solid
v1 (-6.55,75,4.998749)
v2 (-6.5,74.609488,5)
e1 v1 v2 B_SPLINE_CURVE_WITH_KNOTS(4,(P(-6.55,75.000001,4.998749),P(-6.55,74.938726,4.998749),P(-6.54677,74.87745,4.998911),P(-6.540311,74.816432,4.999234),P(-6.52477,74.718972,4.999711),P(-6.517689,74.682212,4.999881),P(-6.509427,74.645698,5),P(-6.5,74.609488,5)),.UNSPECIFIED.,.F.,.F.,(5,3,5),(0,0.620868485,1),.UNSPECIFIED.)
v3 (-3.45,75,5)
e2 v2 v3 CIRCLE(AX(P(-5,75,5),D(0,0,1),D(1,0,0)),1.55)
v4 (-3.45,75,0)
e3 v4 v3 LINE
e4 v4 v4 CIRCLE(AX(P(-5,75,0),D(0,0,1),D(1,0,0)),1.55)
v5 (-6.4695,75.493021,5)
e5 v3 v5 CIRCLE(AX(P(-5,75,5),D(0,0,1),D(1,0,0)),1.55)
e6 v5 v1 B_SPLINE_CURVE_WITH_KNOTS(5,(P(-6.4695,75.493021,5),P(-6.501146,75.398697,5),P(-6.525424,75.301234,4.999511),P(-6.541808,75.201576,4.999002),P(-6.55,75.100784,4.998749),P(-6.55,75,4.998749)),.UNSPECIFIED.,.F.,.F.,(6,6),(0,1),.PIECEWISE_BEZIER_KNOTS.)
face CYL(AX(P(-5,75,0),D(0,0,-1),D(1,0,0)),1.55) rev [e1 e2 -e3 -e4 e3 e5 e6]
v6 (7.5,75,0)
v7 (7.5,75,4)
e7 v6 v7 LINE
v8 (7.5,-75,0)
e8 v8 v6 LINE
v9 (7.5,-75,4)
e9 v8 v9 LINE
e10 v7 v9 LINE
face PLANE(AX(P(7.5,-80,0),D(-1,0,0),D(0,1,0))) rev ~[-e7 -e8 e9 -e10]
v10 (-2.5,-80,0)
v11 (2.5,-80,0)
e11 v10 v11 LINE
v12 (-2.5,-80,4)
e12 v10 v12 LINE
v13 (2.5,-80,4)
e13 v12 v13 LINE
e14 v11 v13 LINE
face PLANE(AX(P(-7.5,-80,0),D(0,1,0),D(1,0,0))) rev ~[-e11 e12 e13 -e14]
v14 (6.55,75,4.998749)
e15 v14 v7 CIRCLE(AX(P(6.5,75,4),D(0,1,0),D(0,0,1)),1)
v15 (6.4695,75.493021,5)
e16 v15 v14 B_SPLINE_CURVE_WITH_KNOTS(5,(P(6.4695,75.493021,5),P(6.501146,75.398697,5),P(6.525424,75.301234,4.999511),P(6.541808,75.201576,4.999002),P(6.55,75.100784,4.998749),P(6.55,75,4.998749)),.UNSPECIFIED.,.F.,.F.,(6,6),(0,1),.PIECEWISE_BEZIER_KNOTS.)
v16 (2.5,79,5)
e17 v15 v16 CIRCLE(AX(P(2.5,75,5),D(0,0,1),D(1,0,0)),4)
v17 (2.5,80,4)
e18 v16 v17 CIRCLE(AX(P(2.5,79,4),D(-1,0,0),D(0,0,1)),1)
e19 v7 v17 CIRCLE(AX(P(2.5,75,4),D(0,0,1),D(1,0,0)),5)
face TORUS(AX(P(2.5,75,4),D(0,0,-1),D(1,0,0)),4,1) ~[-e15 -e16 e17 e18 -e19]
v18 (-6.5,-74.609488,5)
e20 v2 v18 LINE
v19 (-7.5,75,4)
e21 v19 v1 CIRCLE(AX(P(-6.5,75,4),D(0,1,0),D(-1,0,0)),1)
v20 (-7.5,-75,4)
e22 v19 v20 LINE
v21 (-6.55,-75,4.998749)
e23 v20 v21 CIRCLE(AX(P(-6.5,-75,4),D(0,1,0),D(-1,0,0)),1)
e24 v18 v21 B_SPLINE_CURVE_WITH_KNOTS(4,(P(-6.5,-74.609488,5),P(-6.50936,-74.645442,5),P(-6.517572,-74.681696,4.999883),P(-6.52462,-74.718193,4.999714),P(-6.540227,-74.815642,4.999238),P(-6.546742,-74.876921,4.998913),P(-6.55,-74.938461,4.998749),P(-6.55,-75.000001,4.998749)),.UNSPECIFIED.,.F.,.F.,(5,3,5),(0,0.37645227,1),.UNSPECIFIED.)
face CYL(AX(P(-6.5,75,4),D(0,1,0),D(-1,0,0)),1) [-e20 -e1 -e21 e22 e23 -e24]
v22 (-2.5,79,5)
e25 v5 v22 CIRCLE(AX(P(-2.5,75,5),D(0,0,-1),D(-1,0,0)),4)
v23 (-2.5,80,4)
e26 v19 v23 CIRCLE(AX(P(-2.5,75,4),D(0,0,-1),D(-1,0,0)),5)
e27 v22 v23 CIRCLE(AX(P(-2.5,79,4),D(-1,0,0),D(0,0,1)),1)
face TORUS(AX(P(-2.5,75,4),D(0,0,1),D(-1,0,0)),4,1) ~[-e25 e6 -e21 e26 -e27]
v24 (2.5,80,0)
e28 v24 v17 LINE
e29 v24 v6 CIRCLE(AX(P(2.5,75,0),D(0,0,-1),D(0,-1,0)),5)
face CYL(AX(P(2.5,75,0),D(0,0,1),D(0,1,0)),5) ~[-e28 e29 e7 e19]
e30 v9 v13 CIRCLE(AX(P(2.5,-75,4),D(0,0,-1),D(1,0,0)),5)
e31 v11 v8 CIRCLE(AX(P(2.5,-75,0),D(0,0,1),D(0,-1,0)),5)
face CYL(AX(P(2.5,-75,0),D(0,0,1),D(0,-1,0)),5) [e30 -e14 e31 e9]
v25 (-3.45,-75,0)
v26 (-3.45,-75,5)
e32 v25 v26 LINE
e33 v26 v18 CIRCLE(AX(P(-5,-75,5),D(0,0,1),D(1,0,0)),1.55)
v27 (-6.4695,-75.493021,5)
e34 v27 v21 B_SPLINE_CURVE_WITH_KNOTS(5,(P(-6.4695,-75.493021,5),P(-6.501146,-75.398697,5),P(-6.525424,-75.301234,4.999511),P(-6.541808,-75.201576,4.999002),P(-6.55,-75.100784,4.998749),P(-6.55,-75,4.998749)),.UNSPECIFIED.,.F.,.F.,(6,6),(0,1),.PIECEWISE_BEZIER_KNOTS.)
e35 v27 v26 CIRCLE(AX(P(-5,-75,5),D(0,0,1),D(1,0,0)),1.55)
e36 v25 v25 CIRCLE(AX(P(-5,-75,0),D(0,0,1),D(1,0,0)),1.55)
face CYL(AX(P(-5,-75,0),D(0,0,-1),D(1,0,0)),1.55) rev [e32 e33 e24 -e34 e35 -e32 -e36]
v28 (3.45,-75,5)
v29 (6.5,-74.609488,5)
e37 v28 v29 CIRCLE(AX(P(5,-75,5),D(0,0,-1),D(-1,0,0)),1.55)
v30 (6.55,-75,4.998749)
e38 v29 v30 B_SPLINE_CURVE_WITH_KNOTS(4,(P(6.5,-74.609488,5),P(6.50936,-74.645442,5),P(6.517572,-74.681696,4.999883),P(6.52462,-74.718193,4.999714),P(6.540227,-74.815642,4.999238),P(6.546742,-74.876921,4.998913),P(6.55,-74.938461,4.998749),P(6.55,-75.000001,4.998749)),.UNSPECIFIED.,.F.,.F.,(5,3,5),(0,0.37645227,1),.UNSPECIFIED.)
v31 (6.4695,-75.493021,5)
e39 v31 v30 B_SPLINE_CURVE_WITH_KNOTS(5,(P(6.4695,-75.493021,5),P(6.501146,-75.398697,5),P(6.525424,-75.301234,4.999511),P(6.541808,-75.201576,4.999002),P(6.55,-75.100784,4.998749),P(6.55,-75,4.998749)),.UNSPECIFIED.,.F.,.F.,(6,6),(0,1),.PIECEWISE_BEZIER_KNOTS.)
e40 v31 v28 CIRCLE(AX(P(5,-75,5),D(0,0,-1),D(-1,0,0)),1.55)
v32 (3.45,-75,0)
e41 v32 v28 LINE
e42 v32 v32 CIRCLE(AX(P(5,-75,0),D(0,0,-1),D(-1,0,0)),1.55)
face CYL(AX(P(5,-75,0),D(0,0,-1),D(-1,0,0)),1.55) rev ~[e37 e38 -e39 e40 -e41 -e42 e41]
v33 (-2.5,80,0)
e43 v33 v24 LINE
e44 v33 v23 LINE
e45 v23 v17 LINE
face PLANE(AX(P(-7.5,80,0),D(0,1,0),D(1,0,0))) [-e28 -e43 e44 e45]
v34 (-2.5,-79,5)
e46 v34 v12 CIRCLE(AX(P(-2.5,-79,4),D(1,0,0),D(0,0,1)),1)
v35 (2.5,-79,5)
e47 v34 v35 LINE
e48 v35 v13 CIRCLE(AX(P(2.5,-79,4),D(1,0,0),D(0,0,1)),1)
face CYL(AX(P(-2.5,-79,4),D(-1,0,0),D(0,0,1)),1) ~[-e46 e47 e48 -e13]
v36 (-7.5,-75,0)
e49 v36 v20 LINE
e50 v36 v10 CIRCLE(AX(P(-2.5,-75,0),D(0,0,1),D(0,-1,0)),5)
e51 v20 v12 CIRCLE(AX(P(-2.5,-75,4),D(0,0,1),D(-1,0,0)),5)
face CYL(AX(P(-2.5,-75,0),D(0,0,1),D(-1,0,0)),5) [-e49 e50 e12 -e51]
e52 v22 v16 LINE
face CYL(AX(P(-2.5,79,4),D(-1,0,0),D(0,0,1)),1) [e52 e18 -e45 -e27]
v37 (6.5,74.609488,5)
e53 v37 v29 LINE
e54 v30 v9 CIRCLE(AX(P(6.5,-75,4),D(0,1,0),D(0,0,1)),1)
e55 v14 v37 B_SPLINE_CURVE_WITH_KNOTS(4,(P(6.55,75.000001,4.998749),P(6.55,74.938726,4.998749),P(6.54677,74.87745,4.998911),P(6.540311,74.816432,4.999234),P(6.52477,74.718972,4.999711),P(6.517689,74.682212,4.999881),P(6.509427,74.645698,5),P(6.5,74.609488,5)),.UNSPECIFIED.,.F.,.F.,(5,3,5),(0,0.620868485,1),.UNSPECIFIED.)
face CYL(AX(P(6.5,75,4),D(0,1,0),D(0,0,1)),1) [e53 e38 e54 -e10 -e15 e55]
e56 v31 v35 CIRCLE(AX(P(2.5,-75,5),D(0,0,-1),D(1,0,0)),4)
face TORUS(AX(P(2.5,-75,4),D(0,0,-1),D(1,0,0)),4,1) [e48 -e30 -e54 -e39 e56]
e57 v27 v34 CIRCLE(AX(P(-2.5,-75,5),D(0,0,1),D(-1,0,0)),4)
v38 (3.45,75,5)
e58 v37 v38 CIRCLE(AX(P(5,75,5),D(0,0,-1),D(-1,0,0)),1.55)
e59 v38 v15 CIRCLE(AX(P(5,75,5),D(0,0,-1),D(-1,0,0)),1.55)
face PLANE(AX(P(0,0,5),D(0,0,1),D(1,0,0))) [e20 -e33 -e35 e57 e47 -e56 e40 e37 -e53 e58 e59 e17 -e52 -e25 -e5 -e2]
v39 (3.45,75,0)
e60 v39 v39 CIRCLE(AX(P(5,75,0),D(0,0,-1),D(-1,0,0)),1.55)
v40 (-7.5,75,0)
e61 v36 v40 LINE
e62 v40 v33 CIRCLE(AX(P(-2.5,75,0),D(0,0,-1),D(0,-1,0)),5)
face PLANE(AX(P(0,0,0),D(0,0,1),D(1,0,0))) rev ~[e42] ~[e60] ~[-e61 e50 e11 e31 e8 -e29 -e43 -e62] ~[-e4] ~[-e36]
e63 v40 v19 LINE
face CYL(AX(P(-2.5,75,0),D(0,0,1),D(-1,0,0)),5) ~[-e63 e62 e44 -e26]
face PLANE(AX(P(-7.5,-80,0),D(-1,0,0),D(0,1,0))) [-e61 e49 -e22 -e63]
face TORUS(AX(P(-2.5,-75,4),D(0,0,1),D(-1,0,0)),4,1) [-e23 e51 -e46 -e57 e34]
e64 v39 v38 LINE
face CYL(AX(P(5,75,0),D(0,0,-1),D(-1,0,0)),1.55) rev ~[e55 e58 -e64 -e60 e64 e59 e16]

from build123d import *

# Parameters (mm, degrees)
F0_W         = 15
F0_H         = 160
F0_R         = 1.55
F1_DEPTH     = 5
F2_R         = 5
F3_T1_DEPTH  = 150
F3_T3_DEPTH  = 5
F3_T6_ANGLE  = 90
F3_T8_ANGLE  = 90
F3_T10_ANGLE = 90
F3_T12_ANGLE = 90


# Not quite as in the source:
# - a fillet or chamfer that OpenCascade refuses, or shapes differently, is made with other operations: its cross-section is extruded or revolved along the edge and cut away or added


with BuildPart() as f1:
    # F0 (on Top) → F1 (new body)
    with BuildSketch(Plane.XY):
        Rectangle(F0_W, F0_H)
        with Locations((-5, -75)):
            Circle(F0_R, mode=Mode.SUBTRACT)
        with BuildLine():
            ThreePointArc((6.55, -75), (5, -76.55), (3.45, -75))
            ThreePointArc((3.45, -75), (5, -73.45), (6.55, -75))
        make_face(mode=Mode.SUBTRACT)
        with Locations((-5, 75)):
            Circle(F0_R, mode=Mode.SUBTRACT)
        with BuildLine():
            ThreePointArc((6.55, 75), (5, 73.45), (3.45, 75))
            ThreePointArc((3.45, 75), (5, 76.55), (6.55, 75))
        make_face(mode=Mode.SUBTRACT)
    extrude(amount=F1_DEPTH)

    # F2
    f2_edges = [f1.edges().sort_by_distance(p)[0] for p in [
        (7.5, -80, 2.5),
        (-7.5, -80, 2.5),
        (7.5, 80, 2.5),
        (-7.5, 80, 2.5),
    ]]
    fillet(f2_edges, radius=F2_R)

    # F3: fillet of radius 1 on 8 edges, made by hand

    # F3_s2 → F3_t1 (cut)
    with BuildSketch(Plane.XZ.offset(-75)):
        with BuildLine():
            ThreePointArc((6.5, 5), (7.2071067812, 4.7071067812), (7.5, 4))
            Line((7.5, 4), (7.5, 5))
            Line((7.5, 5), (6.5, 5))
        make_face()
        with BuildLine():
            ThreePointArc((-7.5, 4), (-7.2071067812, 4.7071067812), (-6.5, 5))
            Line((-6.5, 5), (-7.5, 5))
            Line((-7.5, 5), (-7.5, 4))
        make_face()
    extrude(amount=F3_T1_DEPTH, mode=Mode.SUBTRACT)

    # F3_s4 → F3_t3 (cut)
    with BuildSketch(Plane.YZ.offset(-2.5)):
        with BuildLine():
            ThreePointArc((79, 5), (79.7071067812, 4.7071067812), (80, 4))
            Line((80, 4), (80, 5))
            Line((80, 5), (79, 5))
        make_face()
        with BuildLine():
            ThreePointArc((-79, 5), (-79.7071067812, 4.7071067812), (-80, 4))
            Line((-80, 4), (-80, 5))
            Line((-80, 5), (-79, 5))
        make_face()
    extrude(amount=F3_T3_DEPTH, mode=Mode.SUBTRACT)

    # F3_s5 → F3_t6 (revolve, cut)
    with BuildSketch(Plane.XZ.offset(-75)):
        with BuildLine():
            ThreePointArc((-7.5, 4), (-7.2071067812, 4.7071067812), (-6.5, 5))
            Line((-6.5, 5), (-7.5, 5))
            Line((-7.5, 5), (-7.5, 4))
        make_face()
    revolve(axis=Axis((-2.5, 75, 5), (0, 0, -1)), revolution_arc=F3_T6_ANGLE, mode=Mode.SUBTRACT)

    # F3_s7 → F3_t8 (revolve, cut)
    with BuildSketch(Plane.XZ.offset(75)):
        with BuildLine():
            ThreePointArc((-7.5, 4), (-7.2071067812, 4.7071067812), (-6.5, 5))
            Line((-6.5, 5), (-7.5, 5))
            Line((-7.5, 5), (-7.5, 4))
        make_face()
    revolve(axis=Axis((-2.5, -75, 5), (0, 0, 1)), revolution_arc=F3_T8_ANGLE, mode=Mode.SUBTRACT)

    # F3_s9 → F3_t10 (revolve, cut)
    with BuildSketch(Plane.XZ.offset(-75)):
        with BuildLine():
            ThreePointArc((6.5, 5), (7.2071067812, 4.7071067812), (7.5, 4))
            Line((7.5, 4), (7.5, 5))
            Line((7.5, 5), (6.5, 5))
        make_face()
    revolve(axis=Axis((2.5, 75, 5), (0, 0, 1)), revolution_arc=F3_T10_ANGLE, mode=Mode.SUBTRACT)

    # F3_s11 → F3_t12 (revolve, cut)
    with BuildSketch(Plane.XZ.offset(75)):
        with BuildLine():
            ThreePointArc((6.5, 5), (7.2071067812, 4.7071067812), (7.5, 4))
            Line((7.5, 4), (7.5, 5))
            Line((7.5, 5), (6.5, 5))
        make_face()
    revolve(axis=Axis((2.5, -75, 5), (0, 0, -1)), revolution_arc=F3_T12_ANGLE, mode=Mode.SUBTRACT)


solid = f1.part
